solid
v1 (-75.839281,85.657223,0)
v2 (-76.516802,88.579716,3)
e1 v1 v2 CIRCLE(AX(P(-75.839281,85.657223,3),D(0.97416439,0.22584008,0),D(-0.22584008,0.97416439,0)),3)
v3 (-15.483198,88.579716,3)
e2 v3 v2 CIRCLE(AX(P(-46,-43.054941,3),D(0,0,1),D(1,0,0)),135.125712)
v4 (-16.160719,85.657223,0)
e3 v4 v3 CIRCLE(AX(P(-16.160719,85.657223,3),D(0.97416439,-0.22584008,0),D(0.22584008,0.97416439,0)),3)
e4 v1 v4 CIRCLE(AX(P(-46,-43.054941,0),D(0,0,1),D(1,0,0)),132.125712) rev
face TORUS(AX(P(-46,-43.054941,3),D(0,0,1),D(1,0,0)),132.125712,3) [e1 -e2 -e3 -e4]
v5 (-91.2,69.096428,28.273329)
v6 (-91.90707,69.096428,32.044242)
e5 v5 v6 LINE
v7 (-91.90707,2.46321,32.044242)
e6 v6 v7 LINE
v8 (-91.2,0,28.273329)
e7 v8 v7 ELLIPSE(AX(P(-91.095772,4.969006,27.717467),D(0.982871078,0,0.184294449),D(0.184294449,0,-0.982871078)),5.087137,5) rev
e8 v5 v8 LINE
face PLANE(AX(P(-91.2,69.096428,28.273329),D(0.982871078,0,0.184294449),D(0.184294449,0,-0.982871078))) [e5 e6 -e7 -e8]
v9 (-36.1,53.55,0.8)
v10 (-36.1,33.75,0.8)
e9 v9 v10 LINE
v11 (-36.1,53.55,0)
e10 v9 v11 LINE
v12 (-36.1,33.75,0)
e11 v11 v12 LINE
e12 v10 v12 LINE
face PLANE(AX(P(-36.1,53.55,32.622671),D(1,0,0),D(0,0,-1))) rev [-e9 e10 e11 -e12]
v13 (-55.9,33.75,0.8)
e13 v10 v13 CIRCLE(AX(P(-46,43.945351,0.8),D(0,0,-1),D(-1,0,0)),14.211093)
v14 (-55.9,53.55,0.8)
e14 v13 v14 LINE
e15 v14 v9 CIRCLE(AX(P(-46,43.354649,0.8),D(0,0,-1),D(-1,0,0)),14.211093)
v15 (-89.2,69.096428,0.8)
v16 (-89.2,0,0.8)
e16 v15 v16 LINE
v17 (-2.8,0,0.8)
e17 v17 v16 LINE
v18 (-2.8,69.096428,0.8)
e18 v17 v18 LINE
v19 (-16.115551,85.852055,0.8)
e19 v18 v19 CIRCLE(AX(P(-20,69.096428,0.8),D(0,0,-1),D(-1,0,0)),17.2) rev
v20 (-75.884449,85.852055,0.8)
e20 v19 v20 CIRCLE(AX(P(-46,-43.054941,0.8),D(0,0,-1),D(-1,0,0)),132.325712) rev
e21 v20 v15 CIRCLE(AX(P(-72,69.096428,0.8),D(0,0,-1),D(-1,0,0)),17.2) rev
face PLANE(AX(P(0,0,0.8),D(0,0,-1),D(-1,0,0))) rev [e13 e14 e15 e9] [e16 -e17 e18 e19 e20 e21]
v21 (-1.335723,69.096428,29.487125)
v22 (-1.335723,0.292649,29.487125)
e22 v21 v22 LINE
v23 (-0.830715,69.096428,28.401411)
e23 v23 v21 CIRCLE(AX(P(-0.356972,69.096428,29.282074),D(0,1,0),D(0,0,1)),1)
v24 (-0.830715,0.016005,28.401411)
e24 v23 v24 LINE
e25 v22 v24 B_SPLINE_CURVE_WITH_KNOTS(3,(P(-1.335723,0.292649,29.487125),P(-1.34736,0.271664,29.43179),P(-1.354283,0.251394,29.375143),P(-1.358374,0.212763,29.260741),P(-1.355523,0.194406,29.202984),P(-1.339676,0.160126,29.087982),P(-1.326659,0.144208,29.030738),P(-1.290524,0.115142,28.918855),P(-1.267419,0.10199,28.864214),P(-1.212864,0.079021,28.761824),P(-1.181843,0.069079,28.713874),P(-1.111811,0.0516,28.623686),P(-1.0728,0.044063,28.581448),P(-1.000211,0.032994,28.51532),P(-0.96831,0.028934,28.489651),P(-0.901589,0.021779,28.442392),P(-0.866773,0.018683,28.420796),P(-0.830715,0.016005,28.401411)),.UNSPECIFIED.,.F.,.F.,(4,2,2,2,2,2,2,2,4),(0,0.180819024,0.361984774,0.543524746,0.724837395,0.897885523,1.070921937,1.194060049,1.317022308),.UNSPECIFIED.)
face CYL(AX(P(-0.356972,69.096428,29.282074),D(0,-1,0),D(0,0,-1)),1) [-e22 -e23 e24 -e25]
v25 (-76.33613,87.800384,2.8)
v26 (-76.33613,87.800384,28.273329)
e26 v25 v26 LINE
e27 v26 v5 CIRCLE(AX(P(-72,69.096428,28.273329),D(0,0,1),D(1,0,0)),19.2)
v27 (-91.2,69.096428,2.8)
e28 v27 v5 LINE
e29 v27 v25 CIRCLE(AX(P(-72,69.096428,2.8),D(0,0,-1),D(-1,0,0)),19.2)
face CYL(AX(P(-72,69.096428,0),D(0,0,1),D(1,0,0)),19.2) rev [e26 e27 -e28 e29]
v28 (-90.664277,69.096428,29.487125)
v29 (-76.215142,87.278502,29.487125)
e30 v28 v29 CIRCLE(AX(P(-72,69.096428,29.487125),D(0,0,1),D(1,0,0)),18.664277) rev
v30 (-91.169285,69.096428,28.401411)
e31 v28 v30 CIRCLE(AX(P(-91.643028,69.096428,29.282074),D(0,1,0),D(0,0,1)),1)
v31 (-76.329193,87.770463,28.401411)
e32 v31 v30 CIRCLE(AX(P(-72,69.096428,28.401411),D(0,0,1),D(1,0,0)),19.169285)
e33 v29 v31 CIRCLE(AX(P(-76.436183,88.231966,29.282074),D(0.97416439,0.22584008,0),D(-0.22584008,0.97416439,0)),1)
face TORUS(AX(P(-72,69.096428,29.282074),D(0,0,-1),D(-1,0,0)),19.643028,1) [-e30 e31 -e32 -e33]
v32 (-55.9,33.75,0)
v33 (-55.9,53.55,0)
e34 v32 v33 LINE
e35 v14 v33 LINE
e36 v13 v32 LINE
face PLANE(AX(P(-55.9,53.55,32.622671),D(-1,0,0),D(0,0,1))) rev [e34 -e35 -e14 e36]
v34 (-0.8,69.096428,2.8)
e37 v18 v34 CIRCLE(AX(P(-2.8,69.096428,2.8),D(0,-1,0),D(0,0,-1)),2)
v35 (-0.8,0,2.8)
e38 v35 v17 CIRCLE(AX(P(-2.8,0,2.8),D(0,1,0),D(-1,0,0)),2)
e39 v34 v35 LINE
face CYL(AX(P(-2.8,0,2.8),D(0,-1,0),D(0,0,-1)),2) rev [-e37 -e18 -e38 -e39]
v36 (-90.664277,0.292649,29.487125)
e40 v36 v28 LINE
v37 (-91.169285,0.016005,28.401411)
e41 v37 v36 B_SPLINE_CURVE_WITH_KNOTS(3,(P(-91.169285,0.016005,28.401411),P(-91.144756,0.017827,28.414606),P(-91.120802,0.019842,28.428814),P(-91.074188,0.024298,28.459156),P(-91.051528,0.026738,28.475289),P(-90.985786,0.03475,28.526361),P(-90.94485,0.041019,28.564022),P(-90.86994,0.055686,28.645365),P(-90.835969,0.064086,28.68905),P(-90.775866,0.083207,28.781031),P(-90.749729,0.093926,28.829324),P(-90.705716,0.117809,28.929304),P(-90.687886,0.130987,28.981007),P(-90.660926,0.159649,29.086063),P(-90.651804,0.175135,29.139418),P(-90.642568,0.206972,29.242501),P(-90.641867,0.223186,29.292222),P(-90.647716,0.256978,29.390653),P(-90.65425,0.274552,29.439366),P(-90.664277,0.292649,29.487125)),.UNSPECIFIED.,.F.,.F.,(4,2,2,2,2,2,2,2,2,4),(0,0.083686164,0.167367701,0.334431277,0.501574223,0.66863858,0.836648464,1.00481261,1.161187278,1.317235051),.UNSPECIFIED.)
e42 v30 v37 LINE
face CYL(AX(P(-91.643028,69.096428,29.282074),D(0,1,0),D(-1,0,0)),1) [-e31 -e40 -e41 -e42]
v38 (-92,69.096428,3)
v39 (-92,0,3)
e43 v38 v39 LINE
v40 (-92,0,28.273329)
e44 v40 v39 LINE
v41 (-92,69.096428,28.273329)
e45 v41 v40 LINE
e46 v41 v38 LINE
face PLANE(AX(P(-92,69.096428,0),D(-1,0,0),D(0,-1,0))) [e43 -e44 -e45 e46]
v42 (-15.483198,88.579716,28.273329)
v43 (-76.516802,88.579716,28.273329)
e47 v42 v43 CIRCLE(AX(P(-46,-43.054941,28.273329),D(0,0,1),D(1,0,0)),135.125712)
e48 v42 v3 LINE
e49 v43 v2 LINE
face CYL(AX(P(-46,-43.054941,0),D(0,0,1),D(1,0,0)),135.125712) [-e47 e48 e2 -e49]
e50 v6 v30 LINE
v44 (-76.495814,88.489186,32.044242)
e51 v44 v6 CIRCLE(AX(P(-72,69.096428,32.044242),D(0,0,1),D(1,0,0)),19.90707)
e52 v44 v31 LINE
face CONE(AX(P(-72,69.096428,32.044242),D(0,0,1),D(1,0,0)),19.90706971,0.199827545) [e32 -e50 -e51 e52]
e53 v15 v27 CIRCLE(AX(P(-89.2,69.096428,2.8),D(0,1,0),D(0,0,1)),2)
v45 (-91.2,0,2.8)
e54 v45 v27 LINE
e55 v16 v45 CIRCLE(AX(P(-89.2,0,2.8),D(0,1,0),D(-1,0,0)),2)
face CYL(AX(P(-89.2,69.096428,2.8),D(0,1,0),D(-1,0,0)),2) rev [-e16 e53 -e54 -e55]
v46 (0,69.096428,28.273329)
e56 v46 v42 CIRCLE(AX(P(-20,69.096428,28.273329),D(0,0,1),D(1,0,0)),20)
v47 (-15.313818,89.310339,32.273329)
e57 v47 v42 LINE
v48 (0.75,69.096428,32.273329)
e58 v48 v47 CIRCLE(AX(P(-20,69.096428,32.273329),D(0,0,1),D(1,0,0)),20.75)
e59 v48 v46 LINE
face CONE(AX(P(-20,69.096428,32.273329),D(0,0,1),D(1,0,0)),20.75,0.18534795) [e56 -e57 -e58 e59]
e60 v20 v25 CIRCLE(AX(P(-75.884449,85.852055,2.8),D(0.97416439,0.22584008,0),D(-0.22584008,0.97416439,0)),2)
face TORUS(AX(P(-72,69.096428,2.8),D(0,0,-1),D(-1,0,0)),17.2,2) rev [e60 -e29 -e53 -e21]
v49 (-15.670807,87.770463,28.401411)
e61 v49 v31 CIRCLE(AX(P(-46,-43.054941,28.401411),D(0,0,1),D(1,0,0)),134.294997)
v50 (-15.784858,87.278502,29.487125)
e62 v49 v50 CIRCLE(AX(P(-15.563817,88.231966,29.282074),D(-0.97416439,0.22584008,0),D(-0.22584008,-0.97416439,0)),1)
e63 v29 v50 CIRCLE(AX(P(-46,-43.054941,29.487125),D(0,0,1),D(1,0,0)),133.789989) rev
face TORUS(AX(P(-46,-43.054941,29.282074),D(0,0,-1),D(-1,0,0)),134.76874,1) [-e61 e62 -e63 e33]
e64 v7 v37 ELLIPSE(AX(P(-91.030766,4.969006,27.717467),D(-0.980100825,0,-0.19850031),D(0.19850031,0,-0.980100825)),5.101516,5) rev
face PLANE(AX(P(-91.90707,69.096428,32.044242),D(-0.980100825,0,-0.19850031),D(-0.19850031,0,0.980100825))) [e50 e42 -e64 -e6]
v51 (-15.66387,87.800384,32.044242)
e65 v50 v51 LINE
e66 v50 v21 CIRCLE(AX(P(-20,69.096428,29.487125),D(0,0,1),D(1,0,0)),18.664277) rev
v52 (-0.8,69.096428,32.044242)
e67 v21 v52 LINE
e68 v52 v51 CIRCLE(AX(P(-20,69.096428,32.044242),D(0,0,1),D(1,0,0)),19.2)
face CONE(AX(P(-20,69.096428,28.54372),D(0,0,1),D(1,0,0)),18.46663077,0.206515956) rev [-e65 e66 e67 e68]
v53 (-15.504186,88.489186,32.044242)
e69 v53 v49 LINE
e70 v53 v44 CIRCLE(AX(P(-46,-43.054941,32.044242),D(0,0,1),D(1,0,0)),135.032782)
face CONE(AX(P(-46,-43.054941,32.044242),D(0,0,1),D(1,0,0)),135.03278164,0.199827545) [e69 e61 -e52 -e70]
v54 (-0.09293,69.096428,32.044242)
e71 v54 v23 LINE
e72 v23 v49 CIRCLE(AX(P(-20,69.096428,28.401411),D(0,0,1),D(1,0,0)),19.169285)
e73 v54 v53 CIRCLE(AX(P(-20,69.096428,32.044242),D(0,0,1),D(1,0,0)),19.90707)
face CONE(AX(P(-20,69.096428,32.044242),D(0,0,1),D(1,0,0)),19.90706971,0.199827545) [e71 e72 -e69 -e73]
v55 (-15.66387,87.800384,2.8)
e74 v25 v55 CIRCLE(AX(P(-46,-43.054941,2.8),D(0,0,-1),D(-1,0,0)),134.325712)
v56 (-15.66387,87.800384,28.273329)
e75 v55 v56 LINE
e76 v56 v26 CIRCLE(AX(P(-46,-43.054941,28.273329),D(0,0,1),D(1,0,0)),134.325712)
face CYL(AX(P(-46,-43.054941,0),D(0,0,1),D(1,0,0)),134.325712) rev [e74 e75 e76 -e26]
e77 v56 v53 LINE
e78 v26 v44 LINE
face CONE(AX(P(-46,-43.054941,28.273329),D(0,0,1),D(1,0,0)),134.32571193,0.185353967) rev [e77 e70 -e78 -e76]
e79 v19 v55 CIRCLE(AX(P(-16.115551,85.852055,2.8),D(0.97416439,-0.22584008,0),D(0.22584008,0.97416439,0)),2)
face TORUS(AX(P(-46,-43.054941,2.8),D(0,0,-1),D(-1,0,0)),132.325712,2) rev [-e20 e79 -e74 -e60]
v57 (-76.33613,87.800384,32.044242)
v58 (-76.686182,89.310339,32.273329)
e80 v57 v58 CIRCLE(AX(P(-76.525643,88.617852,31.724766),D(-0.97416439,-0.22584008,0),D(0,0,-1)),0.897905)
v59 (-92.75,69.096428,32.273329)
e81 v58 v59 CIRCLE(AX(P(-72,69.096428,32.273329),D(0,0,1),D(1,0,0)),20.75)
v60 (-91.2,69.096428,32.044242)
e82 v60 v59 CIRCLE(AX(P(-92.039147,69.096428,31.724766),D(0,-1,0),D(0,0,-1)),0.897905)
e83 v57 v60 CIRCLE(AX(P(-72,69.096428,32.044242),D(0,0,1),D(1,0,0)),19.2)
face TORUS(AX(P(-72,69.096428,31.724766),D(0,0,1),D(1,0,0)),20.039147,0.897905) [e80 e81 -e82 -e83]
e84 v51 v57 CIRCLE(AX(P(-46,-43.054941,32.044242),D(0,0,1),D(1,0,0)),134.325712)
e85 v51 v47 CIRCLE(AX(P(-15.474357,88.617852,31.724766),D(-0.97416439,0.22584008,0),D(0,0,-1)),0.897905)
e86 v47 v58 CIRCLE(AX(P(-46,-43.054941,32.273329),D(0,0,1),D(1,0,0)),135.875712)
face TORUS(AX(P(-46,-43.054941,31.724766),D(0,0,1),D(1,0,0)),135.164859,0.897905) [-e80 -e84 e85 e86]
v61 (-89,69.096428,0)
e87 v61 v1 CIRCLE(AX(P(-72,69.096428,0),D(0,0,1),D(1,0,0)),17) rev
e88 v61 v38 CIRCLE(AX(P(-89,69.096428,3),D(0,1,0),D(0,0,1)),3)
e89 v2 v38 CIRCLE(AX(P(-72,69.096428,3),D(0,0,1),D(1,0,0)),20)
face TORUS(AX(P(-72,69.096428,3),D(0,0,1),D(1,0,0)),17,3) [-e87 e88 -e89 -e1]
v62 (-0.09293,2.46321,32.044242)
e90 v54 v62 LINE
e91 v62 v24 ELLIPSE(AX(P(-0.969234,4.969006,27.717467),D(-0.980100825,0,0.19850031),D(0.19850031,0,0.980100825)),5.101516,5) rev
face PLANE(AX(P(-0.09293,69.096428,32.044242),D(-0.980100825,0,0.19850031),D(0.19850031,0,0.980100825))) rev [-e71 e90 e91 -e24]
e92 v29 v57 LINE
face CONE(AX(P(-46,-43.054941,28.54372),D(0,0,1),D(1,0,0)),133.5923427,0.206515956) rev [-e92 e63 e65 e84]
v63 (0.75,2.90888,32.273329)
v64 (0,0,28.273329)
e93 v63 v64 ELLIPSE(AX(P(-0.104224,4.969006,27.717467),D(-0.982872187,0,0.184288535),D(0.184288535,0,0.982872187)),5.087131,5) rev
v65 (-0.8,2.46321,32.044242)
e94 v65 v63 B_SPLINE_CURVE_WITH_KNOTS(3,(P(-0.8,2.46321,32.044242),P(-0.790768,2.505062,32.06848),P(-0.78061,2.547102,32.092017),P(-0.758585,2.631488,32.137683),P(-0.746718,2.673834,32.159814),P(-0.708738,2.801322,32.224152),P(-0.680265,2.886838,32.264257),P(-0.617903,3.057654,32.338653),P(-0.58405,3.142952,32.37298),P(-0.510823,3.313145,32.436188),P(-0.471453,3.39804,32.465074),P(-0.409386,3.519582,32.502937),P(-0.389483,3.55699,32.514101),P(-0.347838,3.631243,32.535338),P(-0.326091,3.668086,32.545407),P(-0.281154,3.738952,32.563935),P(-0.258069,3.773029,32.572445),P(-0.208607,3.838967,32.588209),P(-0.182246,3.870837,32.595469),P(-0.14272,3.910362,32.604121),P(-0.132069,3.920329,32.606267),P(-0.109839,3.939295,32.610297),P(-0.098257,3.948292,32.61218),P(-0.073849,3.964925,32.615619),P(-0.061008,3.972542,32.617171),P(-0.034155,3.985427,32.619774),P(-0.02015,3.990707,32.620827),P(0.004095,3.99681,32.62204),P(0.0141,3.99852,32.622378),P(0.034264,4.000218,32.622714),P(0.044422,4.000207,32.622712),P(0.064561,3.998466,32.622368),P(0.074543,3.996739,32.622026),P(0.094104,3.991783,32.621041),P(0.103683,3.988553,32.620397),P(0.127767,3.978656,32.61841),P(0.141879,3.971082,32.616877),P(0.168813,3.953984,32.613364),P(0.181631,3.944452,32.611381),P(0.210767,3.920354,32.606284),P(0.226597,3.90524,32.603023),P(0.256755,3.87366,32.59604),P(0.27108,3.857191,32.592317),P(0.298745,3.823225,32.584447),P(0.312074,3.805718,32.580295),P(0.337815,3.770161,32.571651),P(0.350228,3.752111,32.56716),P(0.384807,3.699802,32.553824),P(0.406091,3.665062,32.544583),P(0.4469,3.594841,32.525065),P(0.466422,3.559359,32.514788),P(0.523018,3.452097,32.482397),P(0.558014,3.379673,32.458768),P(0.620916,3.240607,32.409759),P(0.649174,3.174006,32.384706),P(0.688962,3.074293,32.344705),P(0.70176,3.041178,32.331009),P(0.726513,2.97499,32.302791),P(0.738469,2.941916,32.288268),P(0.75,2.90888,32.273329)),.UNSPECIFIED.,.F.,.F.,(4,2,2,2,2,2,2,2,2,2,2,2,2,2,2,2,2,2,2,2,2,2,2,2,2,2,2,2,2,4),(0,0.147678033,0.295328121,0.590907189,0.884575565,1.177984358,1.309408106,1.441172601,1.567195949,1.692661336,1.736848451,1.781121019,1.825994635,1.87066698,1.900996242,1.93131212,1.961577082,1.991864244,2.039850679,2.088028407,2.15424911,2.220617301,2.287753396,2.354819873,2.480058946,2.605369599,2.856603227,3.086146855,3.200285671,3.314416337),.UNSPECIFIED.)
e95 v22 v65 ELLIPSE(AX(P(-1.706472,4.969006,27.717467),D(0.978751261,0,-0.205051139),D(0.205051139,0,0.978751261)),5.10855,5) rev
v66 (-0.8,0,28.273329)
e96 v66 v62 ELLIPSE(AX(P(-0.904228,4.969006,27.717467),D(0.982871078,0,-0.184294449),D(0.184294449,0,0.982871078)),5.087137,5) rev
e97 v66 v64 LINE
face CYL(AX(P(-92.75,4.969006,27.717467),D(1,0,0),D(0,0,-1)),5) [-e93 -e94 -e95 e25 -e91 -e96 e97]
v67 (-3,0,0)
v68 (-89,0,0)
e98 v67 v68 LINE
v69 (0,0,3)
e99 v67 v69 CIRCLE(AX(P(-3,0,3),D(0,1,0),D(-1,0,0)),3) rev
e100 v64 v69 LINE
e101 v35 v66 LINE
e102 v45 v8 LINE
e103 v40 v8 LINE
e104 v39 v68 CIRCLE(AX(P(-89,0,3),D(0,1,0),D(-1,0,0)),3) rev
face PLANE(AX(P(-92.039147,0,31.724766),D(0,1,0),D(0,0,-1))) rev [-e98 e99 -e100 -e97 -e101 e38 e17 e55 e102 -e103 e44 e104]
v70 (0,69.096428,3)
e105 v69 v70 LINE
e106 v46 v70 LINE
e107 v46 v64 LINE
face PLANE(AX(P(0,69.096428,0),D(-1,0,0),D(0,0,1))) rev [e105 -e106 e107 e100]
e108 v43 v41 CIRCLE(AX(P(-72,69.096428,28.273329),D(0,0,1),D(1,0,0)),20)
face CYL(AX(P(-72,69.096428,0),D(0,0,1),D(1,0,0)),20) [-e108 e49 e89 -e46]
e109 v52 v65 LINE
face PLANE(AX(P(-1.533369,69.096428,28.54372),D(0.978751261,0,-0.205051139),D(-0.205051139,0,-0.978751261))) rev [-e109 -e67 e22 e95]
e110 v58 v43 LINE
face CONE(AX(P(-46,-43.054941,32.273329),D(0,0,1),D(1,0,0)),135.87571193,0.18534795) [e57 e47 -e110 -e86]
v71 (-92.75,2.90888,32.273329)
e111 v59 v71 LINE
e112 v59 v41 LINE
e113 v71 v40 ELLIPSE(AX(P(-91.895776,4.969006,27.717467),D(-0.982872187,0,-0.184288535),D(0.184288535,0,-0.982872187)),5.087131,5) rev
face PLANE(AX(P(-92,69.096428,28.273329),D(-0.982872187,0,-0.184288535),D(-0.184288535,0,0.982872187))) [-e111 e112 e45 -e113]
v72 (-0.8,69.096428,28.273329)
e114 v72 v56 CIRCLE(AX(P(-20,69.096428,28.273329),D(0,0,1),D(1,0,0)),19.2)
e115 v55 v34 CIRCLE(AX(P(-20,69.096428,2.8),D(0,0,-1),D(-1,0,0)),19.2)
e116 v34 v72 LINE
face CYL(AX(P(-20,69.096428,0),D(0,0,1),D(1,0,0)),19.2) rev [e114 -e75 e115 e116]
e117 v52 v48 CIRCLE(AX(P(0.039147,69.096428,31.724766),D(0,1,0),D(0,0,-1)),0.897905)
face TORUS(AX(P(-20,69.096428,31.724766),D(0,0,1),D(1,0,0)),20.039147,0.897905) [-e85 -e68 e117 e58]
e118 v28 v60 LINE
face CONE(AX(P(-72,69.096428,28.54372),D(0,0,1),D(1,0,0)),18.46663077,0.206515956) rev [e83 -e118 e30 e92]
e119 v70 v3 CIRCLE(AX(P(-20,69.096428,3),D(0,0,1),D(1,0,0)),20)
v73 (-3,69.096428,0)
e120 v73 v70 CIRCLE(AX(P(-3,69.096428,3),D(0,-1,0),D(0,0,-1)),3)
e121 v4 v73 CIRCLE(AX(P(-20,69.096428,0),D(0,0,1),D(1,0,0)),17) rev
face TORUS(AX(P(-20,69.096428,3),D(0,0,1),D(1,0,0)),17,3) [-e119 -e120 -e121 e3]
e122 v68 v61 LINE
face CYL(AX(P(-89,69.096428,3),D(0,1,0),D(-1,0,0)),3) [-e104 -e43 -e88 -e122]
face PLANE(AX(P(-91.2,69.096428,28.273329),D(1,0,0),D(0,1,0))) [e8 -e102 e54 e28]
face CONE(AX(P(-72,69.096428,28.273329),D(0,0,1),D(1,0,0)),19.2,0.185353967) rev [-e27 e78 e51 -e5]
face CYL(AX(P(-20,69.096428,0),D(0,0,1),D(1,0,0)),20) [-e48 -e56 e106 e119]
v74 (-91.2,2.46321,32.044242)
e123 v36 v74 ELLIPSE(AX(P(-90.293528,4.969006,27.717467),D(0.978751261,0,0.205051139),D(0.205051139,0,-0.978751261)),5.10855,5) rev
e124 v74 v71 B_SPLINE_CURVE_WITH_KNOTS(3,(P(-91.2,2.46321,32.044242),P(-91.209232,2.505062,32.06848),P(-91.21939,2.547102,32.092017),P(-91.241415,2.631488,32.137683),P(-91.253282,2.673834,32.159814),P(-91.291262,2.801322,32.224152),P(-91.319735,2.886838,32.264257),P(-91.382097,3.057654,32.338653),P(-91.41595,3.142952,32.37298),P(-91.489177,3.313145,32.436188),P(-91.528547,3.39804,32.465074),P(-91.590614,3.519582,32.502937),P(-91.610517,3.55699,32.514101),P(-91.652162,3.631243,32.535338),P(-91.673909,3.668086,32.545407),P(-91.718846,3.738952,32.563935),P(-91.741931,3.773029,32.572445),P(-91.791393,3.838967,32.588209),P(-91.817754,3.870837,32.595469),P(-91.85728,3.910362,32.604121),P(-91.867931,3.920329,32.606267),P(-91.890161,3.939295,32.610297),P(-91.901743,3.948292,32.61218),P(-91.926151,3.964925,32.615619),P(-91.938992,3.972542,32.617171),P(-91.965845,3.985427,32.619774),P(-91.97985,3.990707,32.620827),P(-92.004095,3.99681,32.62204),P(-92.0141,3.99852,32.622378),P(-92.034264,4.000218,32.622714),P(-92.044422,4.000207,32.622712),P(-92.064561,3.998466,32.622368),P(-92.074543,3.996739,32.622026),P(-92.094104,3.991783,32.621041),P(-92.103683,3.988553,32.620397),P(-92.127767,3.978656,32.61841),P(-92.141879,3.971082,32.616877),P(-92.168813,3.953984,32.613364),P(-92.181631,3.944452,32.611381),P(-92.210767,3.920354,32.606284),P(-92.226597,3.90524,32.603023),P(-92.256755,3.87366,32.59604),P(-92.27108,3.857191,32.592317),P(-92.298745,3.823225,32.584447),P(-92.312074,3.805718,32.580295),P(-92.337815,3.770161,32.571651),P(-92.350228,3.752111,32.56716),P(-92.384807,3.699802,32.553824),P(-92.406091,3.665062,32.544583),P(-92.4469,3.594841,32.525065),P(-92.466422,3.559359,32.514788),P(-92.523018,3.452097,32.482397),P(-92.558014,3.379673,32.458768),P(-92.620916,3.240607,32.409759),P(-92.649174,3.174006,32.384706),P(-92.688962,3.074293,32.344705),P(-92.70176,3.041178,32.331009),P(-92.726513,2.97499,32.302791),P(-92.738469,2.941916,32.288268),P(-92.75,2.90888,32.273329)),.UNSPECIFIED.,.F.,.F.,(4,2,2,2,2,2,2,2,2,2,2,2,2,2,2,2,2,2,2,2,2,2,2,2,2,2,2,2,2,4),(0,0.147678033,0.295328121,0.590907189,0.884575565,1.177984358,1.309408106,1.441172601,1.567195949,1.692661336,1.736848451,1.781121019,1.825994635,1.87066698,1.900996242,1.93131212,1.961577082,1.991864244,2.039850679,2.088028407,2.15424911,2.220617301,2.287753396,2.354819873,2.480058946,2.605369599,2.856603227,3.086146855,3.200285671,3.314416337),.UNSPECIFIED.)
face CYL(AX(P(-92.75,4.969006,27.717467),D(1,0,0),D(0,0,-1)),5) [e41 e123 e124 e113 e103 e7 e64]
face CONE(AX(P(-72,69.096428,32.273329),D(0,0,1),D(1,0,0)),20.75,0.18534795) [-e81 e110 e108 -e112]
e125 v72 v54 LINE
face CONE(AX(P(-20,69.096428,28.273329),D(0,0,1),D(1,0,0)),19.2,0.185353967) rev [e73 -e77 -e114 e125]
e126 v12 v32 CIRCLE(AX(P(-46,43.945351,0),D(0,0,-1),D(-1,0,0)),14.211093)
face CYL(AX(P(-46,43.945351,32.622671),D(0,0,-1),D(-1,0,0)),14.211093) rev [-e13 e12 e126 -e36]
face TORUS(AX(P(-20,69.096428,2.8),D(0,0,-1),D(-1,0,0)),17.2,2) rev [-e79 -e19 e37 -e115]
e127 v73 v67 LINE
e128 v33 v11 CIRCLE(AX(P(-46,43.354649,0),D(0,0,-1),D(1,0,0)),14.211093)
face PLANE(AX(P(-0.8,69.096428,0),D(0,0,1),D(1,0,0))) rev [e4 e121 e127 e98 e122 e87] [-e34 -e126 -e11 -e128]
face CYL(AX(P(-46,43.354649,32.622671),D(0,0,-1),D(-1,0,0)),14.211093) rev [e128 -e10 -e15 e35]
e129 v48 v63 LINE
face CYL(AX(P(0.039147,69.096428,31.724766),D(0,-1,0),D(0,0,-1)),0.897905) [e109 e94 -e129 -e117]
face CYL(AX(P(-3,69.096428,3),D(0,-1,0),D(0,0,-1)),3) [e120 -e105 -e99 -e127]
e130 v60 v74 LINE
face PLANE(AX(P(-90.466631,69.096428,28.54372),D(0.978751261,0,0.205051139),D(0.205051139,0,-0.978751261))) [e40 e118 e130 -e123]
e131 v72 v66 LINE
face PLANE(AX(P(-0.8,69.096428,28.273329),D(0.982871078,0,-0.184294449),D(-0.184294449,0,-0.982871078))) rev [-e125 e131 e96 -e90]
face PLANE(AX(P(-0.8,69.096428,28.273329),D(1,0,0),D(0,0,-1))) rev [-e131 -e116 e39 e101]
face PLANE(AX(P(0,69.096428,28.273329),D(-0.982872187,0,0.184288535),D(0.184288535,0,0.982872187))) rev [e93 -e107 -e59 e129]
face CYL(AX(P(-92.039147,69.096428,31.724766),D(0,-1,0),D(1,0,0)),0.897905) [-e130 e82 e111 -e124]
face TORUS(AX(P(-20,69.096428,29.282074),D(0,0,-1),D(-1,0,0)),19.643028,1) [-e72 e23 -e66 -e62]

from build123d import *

# Parameters (mm, degrees)
ESBO_O4_W                  = 92
ESBO_O4_H                  = 99.397000359
RESSALTO_EXTRUS_O2_DEPTH   = 0.8
CORTE_EXTRUS_O1_START      = -1
CORTE_EXTRUS_O1_DEPTH      = 1
CORTE_EXTRUS_O2_DEPTH      = 136.212783118
FILETE8_R                  = 1
CORTE_EXTRUS_O4_DEPTH      = 136.212783118
CORTE_EXTRUS_O4_DEPTH_BACK = 136.212783118
FILETE10_R                 = 2
FILETE11_R                 = 3


with BuildPart() as part:
    # Varredura1: sweep along a path in Esboço1
    with BuildLine(Plane.XY) as varredura1_path:
        Line((0, 0), (0, 69.096427937))
        ThreePointArc((0, 69.096427937), (-4.342158003, 81.53957802), (-15.483198399, 88.579715732))
        ThreePointArc((-15.483198399, 88.579715732), (-46, 92.070770961), (-76.516801601, 88.579715732))
        ThreePointArc((-76.516801601, 88.579715732), (-87.657841997, 81.53957802), (-92, 69.096427937))
        Line((-92, 69.096427937), (-92, 0))
    # Esboço2 → Varredura1 (sweep)
    with BuildSketch(Plane(origin=(0, 0, 0), x_dir=(1, 0, 0), z_dir=(0, 1, 0))):
        with BuildLine():
            Line((-0.8, -28.273328944), (-0.09293029, -32.044242141))
            Line((-0.09293029, -32.044242141), (-0.830714704, -28.401410992))
            Line((-0.830714704, -28.401410992), (-1.53336923, -28.543719964))
            Line((-1.53336923, -28.543719964), (-0.8, -32.044242141))
            ThreePointArc((-0.8, -32.044242141), (-0.092135156, -32.613021625), (0.75, -32.273328944))
            Line((0.75, -32.273328944), (0, -28.273328944))
            Line((0, -28.273328944), (0, 0))
            Line((0, 0), (-0.8, 0))
            Line((-0.8, 0), (-0.8, -28.273328944))
        make_face()
    sweep(path=varredura1_path.line)

    # Esboço4 → Ressalto-extrusão2 (add)
    with BuildSketch(Plane(origin=(0, 0, 0), x_dir=(-1, 0, 0), z_dir=(0, 0, -1))):
        with Locations((46, 49.69850018)):
            Rectangle(ESBO_O4_W, ESBO_O4_H)
    extrude(amount=-RESSALTO_EXTRUS_O2_DEPTH)

    # Esboço6 → Corte-extrusão1 (cut)
    with BuildSketch(Plane.XY.offset(0.8).offset(CORTE_EXTRUS_O1_START)):
        with BuildLine():
            Line((-92, 69.096427937), (-92, 105.833978266))
            Line((-92, 105.833978266), (0, 105.833978266))
            Line((0, 105.833978266), (0, 69.096427937))
            ThreePointArc((0, 69.096427937), (-4.342158003, 81.53957802), (-15.483198399, 88.579715732))
            ThreePointArc((-15.483198399, 88.579715732), (-46, 92.070770961), (-76.516801601, 88.579715732))
            ThreePointArc((-76.516801601, 88.579715732), (-87.657841997, 81.53957802), (-92, 69.096427937))
        make_face()
    extrude(amount=CORTE_EXTRUS_O1_DEPTH, mode=Mode.SUBTRACT)

    # Esboço7 → Corte-extrusão2 (cut, through all)
    with BuildSketch(Plane(origin=(0, 0, 0), x_dir=(-1, 0, 0), z_dir=(0, 0, -1))):
        with BuildLine():
            Line((55.9, 53.55), (55.9, 33.75))
            ThreePointArc((55.9, 33.75), (46, 29.734257245), (36.1, 33.75))
            Line((36.1, 33.75), (36.1, 53.55))
            ThreePointArc((36.1, 53.55), (46, 57.565742755), (55.9, 53.55))
        make_face()
    extrude(amount=-CORTE_EXTRUS_O2_DEPTH, mode=Mode.SUBTRACT)

    # Filete8
    # the kernel refuses this fillet: 1 mm, written as the material it takes off along each edge
    with BuildSketch(Plane(origin=(-46, -43.054940969, 28.543719964), x_dir=(0.22584008006616485, 0.9741643897390769, 0), z_dir=(0.9741643897390769, -0.22584008006616485, 0))) as filete8_piece_1:
        with BuildLine():
            CenterArc((134.768740044, 0.738354268), FILETE8_R, 168.167507323, 73.554966167)
            Line((133.789988783, 0.943405407), (133.770413758, 0.947506429))
            Line((133.770413758, 0.947506429), (133.572767675, 0.004101023))
            Line((133.572767675, 0.004101023), (133.588372694, -0.019602016))
            ThreePointArc((133.588372694, -0.019602016), (133.939699957, -0.090756503), (134.28552237, -0.159922237))
            Line((134.28552237, -0.159922237), (134.294997227, -0.142308972))
        make_face()
    revolve(axis=Axis((-46, -43.054940969, 28.543719964), (0, 0, 1)), revolution_arc=26.104565599, mode=Mode.SUBTRACT)
    with BuildSketch(Plane(origin=(-72, 69.096427937, 28.543719964), x_dir=(-0.2258400800661638, 0.9741643897390773, 0), z_dir=(0.9741643897390773, 0.2258400800661638, 0))) as filete8_piece_2:
        with BuildLine():
            CenterArc((19.643028114, 0.738354268), FILETE8_R, 168.167507323, 73.554966167)
            Line((19.169285296, -0.142308972), (19.15981044, -0.159922237))
            ThreePointArc((19.15981044, -0.159922237), (18.813988027, -0.090756503), (18.462660764, -0.019602016))
            Line((18.462660764, -0.019602016), (18.447055745, 0.004101023))
            Line((18.447055745, 0.004101023), (18.644701828, 0.947506429))
            Line((18.644701828, 0.947506429), (18.664276853, 0.943405407))
        make_face()
    revolve(axis=Axis((-72, 69.096427937, 28.543719964), (0, 0, 1)), revolution_arc=76.9477172, mode=Mode.SUBTRACT)
    with BuildSketch(Plane(origin=(-90.46663077, 69.096427937, 28.543719964), x_dir=(-0.20505113872706254, 0, 0.9787512607944548), z_dir=(0, -1, 0))) as filete8_piece_3:
        with BuildLine():
            CenterArc((0.963886786, 1), FILETE8_R, 196.445033833, 73.554966167)
            Line((0.004795025, 0.716904621), (-0.014386811, 0.711242713))
            ThreePointArc((-0.014386811, 0.711242713), (-0.01760204, 0.358586078), (-0.019999553, 0.000133767))
            Line((-0.019999553, 0.000133767), (0, -0.02))
            Line((0, -0.02), (0.963886786, -0.02))
            Line((0.963886786, -0.02), (0.963886786, 0))
        make_face()
    extrude(amount=71.506144901, mode=Mode.SUBTRACT)
    with BuildSketch(Plane(origin=(-20, 69.096427937, 28.543719964), x_dir=(1, 0, 0), z_dir=(0, -1, 0))) as filete8_piece_4:
        with BuildLine():
            CenterArc((19.643028114, 0.738354268), FILETE8_R, 168.167507323, 73.554966167)
            Line((18.664276853, 0.943405407), (18.644701828, 0.947506429))
            Line((18.644701828, 0.947506429), (18.447055745, 0.004101023))
            Line((18.447055745, 0.004101023), (18.462660764, -0.019602016))
            ThreePointArc((18.462660764, -0.019602016), (18.813988027, -0.090756503), (19.15981044, -0.159922237))
            Line((19.15981044, -0.159922237), (19.169285296, -0.142308972))
        make_face()
    revolve(axis=Axis((-20, 69.096427937, 28.543719964), (0, 0, 1)), revolution_arc=76.9477172, mode=Mode.SUBTRACT)
    with BuildSketch(Plane(origin=(-1.53336923, -2.409716964, 28.543719964), x_dir=(0.9801008248789868, 0, -0.19850031000361154), z_dir=(0, 1, 0))) as filete8_piece_5:
        with BuildLine():
            CenterArc((1.006424456, -0.957176864), FILETE8_R, 106.828251577, 73.554966167)
            Line((0.006446823, -0.963865226), (-0.013552729, -0.963998993))
            Line((-0.013552729, -0.963998993), (-0.019999553, -0.000133767))
            Line((-0.019999553, -0.000133767), (0, 0.02))
            ThreePointArc((0, 0.02), (0.358460328, 0.02), (0.71113058, 0.019143537))
            Line((0.71113058, 0.019143537), (0.716920656, 0))
        make_face()
    extrude(amount=71.506144901, mode=Mode.SUBTRACT)

    # Esboço8 → Corte-extrusão4 (cut, two sides: drawn at the far end of the back side and taken through both)
    with BuildSketch(Plane(origin=(0, 0, 0), x_dir=(0, 0, -1), z_dir=(1, 0, 0)).offset(-CORTE_EXTRUS_O4_DEPTH_BACK)):
        with BuildLine():
            Line((-14.136664472, 0), (-28.273328944, 0))
            ThreePointArc((-28.273328944, 0), (-31.102110178, 1.288762683), (-32.622670844, 4))
            Line((-32.622670844, 4), (-38.469837325, 4))
            Line((-38.469837325, 4), (-38.469837325, -4.573477319))
            Line((-38.469837325, -4.573477319), (-14.136664472, -4.573477319))
            Line((-14.136664472, -4.573477319), (-14.136664472, 0))
        make_face()
    extrude(amount=CORTE_EXTRUS_O4_DEPTH + CORTE_EXTRUS_O4_DEPTH_BACK, mode=Mode.SUBTRACT)

    # Filete10
    filete10_edges = [part.edges().sort_by_distance(p)[0] for p in [
        (-0.8, 34.548213968, 0.8),
        (-91.2, 34.548213968, 0.8),
        (-87.031528317, 81.041852016, 0.8),
        (-46, 91.270770961, 0.8),
        (-4.968471683, 81.041852016, 0.8),
    ]]
    fillet(filete10_edges, radius=FILETE10_R)

    # Filete11
    filete11_edges = [part.edges().sort_by_distance(p)[0] for p in [
        (0, 34.548213968, 0),
        (-92, 34.548213968, 0),
        (-87.657841997, 81.53957802, 0),
        (-4.342158003, 81.53957802, 0),
        (-46, 92.070770961, 0),
    ]]
    fillet(filete11_edges, radius=FILETE11_R)


solid = part.part
